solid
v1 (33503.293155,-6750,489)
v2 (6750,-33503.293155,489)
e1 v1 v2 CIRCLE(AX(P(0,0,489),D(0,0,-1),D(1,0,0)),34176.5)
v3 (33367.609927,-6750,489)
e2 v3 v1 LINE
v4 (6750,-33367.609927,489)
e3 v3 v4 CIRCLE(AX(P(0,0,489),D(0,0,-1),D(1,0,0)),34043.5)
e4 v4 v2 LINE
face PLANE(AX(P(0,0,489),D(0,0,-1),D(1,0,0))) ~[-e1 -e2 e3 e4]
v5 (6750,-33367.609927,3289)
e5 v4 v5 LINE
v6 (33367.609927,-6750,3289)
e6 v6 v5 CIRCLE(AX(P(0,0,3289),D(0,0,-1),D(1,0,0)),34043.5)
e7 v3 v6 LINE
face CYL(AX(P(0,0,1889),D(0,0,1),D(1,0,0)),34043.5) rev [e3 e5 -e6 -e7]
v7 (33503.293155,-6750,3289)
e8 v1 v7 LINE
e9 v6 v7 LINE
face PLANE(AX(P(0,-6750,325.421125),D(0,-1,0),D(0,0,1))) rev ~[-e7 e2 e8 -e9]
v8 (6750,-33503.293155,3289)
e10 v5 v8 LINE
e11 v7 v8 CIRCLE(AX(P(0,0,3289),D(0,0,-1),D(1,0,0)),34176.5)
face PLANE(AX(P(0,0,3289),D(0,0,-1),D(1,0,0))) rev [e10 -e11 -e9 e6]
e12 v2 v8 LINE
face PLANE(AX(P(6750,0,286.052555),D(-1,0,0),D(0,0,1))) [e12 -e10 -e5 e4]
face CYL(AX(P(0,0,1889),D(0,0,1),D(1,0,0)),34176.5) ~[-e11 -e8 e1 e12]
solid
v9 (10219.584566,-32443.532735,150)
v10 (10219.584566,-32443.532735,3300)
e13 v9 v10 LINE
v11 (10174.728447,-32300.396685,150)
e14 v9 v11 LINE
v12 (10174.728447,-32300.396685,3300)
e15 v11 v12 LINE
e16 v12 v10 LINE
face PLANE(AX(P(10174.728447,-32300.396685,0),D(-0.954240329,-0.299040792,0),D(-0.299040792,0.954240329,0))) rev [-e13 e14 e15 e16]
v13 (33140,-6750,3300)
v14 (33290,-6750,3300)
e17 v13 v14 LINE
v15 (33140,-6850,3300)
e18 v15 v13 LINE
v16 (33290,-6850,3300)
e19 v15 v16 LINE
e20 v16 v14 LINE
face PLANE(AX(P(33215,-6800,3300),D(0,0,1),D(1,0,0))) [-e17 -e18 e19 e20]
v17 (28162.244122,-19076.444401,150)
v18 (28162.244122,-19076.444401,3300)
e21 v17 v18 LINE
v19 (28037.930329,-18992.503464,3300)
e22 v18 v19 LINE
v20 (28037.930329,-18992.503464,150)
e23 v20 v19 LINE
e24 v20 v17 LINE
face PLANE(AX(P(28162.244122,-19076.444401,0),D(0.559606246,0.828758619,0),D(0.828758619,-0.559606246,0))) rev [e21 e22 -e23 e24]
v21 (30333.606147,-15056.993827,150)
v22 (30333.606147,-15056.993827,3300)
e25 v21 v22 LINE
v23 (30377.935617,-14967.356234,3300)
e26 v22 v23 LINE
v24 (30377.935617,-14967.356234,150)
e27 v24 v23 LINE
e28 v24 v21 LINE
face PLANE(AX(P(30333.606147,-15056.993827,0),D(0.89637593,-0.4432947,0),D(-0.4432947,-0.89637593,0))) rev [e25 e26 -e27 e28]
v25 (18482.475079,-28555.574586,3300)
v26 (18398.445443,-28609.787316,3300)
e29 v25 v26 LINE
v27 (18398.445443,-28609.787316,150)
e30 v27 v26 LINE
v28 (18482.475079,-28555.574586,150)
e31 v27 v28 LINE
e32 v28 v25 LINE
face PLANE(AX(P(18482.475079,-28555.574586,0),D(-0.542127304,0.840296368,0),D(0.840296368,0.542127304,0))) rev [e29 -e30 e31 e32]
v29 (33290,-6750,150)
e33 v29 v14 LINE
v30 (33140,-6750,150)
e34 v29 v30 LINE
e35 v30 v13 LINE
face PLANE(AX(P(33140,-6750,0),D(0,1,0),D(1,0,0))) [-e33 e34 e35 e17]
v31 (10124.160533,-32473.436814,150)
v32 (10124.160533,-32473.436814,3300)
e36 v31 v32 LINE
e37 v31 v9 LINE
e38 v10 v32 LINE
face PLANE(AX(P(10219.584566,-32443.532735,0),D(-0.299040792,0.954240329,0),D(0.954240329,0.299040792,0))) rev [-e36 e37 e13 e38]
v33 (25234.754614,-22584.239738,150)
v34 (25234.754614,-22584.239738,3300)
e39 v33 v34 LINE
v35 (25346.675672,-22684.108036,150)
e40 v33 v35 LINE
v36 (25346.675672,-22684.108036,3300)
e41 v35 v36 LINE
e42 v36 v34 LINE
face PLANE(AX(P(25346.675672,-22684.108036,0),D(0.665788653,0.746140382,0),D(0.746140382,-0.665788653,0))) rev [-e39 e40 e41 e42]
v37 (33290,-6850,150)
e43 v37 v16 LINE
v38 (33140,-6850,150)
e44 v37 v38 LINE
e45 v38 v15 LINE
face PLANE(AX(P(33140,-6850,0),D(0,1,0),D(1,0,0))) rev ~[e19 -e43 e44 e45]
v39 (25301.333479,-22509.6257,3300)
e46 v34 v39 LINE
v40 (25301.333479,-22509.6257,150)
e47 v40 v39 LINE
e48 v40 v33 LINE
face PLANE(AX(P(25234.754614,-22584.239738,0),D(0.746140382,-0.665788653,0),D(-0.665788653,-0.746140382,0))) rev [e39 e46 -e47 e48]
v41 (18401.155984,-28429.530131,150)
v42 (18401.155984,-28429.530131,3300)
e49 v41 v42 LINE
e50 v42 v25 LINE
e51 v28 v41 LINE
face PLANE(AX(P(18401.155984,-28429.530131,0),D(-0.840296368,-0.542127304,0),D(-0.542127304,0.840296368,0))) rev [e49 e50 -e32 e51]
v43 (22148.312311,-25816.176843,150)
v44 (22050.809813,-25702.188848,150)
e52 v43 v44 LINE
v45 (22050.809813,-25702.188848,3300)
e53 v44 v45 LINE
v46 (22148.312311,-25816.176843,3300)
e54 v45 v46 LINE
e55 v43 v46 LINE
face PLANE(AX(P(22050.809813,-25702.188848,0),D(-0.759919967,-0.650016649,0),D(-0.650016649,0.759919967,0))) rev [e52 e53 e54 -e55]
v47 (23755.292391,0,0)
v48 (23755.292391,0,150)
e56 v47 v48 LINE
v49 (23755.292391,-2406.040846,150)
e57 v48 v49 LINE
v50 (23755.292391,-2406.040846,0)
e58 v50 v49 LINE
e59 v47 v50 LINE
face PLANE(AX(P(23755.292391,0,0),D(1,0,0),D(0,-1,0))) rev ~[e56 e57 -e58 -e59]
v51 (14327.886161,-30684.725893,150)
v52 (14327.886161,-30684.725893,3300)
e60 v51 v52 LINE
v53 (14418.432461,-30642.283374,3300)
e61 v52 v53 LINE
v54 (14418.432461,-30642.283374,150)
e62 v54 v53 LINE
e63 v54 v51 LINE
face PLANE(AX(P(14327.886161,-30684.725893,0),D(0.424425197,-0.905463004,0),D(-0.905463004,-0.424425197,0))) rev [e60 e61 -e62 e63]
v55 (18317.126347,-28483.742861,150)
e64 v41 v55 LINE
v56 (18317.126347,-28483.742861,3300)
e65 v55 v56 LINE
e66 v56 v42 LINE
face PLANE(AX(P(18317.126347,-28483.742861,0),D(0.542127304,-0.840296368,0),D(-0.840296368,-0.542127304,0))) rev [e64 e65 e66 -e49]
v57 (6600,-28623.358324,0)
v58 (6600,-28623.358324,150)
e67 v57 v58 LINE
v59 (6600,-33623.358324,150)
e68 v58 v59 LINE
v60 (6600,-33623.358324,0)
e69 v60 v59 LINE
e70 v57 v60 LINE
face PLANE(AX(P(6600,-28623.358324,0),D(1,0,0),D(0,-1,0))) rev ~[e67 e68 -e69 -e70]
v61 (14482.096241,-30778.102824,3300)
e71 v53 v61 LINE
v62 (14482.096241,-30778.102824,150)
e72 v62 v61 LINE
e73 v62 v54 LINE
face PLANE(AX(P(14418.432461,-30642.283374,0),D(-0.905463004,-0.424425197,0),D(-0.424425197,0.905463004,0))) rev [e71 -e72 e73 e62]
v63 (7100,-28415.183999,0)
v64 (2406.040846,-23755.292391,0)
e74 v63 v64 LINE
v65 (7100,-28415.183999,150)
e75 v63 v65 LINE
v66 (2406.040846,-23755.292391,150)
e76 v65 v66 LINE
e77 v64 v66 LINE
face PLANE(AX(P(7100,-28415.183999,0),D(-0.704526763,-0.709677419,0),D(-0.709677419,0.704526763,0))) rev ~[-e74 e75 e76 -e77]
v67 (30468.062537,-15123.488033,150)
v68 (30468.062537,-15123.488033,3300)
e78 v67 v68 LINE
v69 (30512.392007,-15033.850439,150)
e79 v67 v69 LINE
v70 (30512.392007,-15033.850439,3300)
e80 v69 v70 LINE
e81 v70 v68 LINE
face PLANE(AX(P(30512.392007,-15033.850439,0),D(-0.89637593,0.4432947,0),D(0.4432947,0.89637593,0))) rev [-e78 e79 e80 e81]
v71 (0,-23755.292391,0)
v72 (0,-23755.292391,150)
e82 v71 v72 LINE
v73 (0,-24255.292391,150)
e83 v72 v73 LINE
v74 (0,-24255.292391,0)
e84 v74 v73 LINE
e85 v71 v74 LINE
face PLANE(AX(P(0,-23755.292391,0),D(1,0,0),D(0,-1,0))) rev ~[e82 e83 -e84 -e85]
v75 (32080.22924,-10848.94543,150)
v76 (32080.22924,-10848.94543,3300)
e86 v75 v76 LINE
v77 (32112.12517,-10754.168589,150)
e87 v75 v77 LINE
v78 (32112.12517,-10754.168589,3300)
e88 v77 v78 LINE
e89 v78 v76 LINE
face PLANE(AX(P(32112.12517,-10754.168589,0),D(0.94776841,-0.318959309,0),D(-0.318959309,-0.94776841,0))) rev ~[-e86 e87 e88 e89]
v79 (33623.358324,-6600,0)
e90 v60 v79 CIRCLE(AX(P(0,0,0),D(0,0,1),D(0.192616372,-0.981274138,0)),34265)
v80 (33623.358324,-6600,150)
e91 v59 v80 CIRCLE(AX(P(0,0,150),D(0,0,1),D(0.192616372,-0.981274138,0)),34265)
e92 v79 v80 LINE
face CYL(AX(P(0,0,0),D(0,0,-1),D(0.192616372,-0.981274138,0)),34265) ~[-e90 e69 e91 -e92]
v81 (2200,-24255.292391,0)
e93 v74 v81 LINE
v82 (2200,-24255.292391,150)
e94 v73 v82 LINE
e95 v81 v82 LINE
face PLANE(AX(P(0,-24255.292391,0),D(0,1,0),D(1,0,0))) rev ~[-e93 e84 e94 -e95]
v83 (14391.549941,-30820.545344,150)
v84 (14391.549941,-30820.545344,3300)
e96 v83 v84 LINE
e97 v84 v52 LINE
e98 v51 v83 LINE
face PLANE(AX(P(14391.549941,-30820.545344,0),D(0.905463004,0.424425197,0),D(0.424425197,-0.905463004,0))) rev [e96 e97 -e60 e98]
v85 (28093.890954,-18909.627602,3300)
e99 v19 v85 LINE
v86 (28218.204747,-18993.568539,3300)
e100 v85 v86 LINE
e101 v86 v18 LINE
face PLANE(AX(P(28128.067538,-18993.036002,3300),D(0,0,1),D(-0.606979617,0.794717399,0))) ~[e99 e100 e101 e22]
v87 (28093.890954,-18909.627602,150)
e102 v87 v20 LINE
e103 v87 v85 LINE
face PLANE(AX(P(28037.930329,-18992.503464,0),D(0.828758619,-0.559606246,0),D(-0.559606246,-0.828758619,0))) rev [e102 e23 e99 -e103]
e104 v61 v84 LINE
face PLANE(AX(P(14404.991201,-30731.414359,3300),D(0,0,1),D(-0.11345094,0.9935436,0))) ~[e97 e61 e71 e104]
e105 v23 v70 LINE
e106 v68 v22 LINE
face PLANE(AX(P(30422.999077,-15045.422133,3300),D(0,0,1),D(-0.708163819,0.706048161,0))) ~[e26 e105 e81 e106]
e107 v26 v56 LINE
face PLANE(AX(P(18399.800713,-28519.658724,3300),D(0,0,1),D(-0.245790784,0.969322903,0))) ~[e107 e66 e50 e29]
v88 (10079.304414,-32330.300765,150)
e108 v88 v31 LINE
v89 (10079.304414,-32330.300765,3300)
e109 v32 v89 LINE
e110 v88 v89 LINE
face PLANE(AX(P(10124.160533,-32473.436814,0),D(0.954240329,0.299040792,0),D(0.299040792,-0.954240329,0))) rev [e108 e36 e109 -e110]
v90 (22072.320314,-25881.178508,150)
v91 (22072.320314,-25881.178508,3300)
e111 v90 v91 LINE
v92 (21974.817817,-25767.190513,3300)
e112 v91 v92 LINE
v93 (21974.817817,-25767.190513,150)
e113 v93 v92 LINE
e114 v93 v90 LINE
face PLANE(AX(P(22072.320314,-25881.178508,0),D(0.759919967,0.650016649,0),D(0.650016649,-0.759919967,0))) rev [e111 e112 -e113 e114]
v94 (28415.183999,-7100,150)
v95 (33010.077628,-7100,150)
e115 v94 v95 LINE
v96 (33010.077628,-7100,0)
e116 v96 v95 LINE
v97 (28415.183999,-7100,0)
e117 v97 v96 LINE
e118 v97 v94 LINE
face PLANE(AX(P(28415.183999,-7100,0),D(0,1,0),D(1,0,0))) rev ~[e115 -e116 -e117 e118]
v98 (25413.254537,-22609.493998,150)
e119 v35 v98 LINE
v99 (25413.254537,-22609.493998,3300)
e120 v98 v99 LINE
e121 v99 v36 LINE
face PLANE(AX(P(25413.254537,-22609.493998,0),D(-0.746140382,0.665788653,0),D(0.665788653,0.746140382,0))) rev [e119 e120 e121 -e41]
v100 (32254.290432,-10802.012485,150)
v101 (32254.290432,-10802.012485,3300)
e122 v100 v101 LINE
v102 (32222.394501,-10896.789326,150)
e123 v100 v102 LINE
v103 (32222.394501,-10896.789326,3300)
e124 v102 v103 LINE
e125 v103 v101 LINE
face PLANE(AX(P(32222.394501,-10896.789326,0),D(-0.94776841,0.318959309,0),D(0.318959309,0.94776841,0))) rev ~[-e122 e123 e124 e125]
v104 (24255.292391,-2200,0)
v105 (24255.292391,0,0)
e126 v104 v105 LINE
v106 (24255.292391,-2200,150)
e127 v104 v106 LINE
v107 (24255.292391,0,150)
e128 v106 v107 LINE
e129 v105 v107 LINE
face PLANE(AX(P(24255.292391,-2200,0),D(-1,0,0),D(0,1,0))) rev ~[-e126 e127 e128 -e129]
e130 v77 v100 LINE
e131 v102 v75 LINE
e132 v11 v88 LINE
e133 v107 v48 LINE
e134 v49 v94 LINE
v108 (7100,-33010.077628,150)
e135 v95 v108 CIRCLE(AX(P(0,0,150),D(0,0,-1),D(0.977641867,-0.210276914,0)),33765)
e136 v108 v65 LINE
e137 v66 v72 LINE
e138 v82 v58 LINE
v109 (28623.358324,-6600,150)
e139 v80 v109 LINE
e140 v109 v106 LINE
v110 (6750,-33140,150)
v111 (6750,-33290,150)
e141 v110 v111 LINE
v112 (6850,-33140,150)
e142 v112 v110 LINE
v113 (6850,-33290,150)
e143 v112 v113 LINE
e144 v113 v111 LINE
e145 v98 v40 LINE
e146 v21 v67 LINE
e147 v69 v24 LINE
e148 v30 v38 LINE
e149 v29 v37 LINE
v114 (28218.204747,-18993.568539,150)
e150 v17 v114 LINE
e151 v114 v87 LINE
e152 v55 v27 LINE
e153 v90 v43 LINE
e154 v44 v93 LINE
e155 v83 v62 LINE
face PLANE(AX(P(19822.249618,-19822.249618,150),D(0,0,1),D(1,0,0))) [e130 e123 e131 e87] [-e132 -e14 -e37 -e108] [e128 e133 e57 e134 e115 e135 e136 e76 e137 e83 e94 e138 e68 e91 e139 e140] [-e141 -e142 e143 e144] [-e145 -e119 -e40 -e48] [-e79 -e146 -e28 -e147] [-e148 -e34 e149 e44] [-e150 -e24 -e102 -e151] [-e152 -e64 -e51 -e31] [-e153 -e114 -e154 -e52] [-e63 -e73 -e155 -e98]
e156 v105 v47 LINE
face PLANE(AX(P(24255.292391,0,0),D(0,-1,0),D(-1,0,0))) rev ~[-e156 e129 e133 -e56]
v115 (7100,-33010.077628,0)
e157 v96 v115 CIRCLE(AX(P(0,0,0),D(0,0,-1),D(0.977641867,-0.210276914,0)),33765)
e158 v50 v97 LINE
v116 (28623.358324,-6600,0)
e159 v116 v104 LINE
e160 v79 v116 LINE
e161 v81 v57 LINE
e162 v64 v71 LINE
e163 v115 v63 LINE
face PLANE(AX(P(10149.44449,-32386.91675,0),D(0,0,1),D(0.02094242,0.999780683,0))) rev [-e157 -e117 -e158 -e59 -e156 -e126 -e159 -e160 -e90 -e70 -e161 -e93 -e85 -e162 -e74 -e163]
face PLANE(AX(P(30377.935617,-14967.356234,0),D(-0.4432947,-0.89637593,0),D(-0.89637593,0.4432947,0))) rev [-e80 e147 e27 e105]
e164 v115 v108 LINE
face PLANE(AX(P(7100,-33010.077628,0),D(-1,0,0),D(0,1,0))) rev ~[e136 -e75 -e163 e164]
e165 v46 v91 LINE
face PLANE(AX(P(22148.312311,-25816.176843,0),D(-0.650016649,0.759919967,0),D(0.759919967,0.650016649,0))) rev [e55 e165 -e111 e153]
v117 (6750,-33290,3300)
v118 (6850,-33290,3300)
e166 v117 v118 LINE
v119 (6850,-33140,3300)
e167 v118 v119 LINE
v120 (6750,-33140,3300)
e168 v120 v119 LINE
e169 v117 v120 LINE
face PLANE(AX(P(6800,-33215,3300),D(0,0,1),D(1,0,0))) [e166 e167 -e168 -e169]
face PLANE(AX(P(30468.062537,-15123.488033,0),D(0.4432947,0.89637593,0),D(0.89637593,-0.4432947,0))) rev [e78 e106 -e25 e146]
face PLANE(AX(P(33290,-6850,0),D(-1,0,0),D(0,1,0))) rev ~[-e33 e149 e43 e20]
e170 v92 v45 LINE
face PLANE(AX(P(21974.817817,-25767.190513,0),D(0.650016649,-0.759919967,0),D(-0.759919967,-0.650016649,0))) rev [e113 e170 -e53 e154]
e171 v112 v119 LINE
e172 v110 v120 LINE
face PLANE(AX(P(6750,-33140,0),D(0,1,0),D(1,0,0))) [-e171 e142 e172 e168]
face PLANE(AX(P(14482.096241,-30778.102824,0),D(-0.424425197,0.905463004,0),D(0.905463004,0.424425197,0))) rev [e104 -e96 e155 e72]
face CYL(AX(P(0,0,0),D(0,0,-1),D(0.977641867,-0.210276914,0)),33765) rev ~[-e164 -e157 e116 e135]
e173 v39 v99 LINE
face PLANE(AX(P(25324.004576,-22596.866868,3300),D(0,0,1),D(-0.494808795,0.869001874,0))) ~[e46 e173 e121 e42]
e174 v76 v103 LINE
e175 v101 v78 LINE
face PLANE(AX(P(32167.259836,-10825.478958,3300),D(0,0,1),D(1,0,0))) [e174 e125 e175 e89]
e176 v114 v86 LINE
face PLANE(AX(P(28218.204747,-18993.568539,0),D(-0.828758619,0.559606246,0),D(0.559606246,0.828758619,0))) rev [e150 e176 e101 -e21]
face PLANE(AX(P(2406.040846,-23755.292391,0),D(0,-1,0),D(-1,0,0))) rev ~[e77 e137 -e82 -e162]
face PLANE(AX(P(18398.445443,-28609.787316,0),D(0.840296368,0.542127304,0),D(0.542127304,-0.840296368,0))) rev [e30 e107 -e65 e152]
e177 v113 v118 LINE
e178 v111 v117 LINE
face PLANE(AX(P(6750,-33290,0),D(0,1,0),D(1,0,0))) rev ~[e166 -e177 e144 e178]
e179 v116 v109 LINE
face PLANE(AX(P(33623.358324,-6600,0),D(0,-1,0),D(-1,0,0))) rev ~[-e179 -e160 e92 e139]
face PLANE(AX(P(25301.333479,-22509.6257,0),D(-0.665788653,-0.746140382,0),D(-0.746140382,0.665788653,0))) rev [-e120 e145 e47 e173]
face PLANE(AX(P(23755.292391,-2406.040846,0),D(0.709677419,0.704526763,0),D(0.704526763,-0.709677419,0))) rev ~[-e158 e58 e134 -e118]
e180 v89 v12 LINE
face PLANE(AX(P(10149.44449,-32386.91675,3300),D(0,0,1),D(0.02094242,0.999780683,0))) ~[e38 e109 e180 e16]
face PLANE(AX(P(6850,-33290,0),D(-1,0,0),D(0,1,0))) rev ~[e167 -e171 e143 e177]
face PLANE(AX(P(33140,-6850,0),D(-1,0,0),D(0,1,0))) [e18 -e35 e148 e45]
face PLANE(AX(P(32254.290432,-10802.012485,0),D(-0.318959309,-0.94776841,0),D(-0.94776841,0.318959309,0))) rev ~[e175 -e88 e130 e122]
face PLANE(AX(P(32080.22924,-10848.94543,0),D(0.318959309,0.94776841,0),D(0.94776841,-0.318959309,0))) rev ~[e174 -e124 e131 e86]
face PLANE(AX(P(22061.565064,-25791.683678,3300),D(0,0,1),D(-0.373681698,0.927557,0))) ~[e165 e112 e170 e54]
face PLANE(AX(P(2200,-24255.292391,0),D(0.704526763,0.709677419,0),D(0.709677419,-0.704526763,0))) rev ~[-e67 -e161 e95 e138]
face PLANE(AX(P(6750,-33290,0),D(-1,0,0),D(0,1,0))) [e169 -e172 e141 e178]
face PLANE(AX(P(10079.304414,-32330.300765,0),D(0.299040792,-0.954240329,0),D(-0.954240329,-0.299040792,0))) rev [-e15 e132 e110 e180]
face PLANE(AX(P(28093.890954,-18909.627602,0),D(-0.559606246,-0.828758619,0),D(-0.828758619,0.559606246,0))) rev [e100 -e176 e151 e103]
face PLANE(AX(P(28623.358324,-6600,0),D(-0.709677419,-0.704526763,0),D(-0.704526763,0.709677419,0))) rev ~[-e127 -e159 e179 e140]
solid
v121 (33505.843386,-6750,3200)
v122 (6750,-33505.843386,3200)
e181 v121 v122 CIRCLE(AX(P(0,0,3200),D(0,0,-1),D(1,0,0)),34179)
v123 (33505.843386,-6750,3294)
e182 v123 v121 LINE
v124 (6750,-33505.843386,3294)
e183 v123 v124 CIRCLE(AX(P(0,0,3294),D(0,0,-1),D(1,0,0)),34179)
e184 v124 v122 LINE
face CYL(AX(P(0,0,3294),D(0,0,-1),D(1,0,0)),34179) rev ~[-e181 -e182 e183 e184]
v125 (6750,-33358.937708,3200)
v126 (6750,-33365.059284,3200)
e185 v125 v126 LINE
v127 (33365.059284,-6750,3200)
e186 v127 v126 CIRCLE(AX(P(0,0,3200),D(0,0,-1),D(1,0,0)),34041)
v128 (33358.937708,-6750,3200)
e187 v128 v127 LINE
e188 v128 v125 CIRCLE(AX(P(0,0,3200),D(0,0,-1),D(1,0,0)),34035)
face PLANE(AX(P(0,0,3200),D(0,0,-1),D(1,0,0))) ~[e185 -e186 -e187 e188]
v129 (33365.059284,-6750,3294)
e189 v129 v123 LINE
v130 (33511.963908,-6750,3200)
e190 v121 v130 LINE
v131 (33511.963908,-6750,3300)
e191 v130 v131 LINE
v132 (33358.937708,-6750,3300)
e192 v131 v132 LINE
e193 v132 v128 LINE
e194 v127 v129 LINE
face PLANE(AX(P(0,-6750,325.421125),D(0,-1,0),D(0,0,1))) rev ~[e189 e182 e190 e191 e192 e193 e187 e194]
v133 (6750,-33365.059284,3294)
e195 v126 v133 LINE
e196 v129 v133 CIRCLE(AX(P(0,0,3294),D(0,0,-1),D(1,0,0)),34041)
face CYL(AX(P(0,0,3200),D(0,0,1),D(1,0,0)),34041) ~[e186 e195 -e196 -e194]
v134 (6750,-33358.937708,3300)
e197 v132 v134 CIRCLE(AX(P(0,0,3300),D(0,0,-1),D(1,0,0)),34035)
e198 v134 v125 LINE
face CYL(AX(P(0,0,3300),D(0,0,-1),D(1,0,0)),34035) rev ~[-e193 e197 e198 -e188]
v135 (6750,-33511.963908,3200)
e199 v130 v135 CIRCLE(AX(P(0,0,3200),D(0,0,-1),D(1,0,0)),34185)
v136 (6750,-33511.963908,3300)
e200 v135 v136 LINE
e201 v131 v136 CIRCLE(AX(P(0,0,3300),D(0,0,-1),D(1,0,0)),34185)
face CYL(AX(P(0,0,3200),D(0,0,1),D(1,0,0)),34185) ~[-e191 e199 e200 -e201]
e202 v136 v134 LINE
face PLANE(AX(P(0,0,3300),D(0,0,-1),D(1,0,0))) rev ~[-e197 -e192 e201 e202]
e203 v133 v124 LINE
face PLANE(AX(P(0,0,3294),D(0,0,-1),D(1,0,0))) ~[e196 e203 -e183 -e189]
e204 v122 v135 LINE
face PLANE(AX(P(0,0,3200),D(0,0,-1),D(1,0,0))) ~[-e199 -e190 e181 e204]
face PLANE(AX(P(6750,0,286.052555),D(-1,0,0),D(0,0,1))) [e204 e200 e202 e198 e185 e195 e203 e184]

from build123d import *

# Parameters (mm, degrees)
F2_DEPTH  = 150
F3_W      = 150
F3_H      = 100
F3_W_2    = 100
F3_H_2    = 150
F4_DEPTH  = 3300
F7_DEPTH  = 3300
F9_ANGLE  = 90
F10_W     = 133
F10_H     = 2800
F11_ANGLE = 90
F12_W     = 6750
F12_H     = 3694.4781839848
F13_DEPTH = 34185.001
F14_W     = 6750
F14_H     = 4040.5442416668
F15_DEPTH = 34185.001


# Not quite as in the source:
# - a pattern or mirror of a feature is missing from the dataset's text; its kind, count and spacing are read off the source's solid


with BuildPart() as f2:
    # F1 (on Top) → F2 (new body)
    with BuildSketch(Plane.XY):
        with BuildLine():
            Line((6600, -28623.3583242364), (6600, -33623.3583242364))
            ThreePointArc((6600, -33623.3583242364), (24229.0138573571, -24229.0138573571), (33623.3583242364, -6600))
            Line((33623.3583242364, -6600), (28623.3583242364, -6600))
            Line((28623.3583242364, -6600), (24255.2923906681, -2200))
            Line((24255.2923906681, -2200), (24255.2923906681, 0))
            Line((24255.2923906681, 0), (23755.2923906681, 0))
            Line((23755.2923906681, 0), (23755.2923906681, -2406.040845923))
            Line((23755.2923906681, -2406.040845923), (28415.1839985056, -7100))
            Line((28415.1839985056, -7100), (33010.0776279002, -7100))
            ThreePointArc((33010.0776279002, -7100), (23875.4604667638, -23875.4604667638), (7100, -33010.0776279002))
            Line((7100, -33010.0776279002), (7100, -28415.1839985056))
            Line((7100, -28415.1839985056), (2406.040845923, -23755.2923906681))
            Line((2406.040845923, -23755.2923906681), (0, -23755.2923906681))
            Line((0, -23755.2923906681), (0, -24255.2923906681))
            Line((0, -24255.2923906681), (2200, -24255.2923906681))
            Line((2200, -24255.2923906681), (6600, -28623.3583242364))
        make_face()
    extrude(amount=F2_DEPTH)

    # F3 (on Top) → F4 (join)
    with BuildSketch(Plane.XY):
        with Locations((33215, -6800)):
            Rectangle(F3_W, F3_H)
        with Locations((6800, -33215)):
            Rectangle(F3_W_2, F3_H_2)
    extrude(amount=F4_DEPTH)

    # F6 (on Top) → F7 (join)
    with BuildSketch(Plane.XY):
        Polygon((32112.1251704395, -10754.1685888787), (32096.1772049746, -10801.5570093792), (32080.2292395097, -10848.9454298796), (32222.3945010112, -10896.7893262743), (32238.3424664761, -10849.4009057739), (32254.290431941, -10802.0124852734), align=None)
    f7 = extrude(amount=F7_DEPTH)

    # F7_copies: F7 across plane
    add(f7.mirror(Plane(origin=(0, 0, 0), x_dir=(-0.9241655206, 0.3819922651, 0), z_dir=(-0.3819922651, -0.9241655206, 0))))

    # F7_copies1: F7 across plane
    add(f7.mirror(Plane(origin=(0, 0, 0), x_dir=(-0.8963759304, 0.4432947005, 0), z_dir=(-0.4432947005, -0.8963759304, 0))))

    # F7_copies2: F7 across plane
    add(f7.mirror(Plane(origin=(0, 0, 0), x_dir=(-0.8645255332, 0.5025889001, 0), z_dir=(-0.5025889001, -0.8645255332, 0))))

    # F7_copies3: F7 across plane
    add(f7.mirror(Plane(origin=(0, 0, 0), x_dir=(-0.8287586193, 0.5596062464, 0), z_dir=(-0.5596062464, -0.8287586193, 0))))

    # F7_copies4: F7 across plane
    add(f7.mirror(Plane(origin=(0, 0, 0), x_dir=(-0.7892372217, 0.6140884365, 0), z_dir=(-0.6140884365, -0.7892372217, 0))))

    # F7_copies5: F7 across plane
    add(f7.mirror(Plane(origin=(0, 0, 0), x_dir=(-0.7461403823, 0.6657886526, 0), z_dir=(-0.6657886526, -0.7461403823, 0))))

    # F7_copies6: F7 across plane
    add(f7.mirror(Plane(origin=(0, 0, 0), x_dir=(0.6996633405, -0.7144726796, 0), z_dir=(-0.7144726796, -0.6996633405, 0))))


with BuildPart() as f9:
    # F8 (on Front) → F9 (revolve)
    with BuildSketch(Plane.XZ):
        Polygon((34185, 3300), (34035, 3300), (34035, 3200), (34041, 3200), (34041, 3294), (34179, 3294), (34179, 3200), (34185, 3200), align=None)
    revolve(axis=Axis((0, 0, 3739.7677898407), (0, 0, -1)), revolution_arc=F9_ANGLE)


with BuildPart() as f11:
    # F10 (on Front) → F11 (revolve)
    with BuildSketch(Plane.XZ):
        with Locations((34110, 1889)):
            Rectangle(F10_W, F10_H)
    revolve(axis=Axis((0, 0, 3739.7677898407), (0, 0, -1)), revolution_arc=F11_ANGLE)


with BuildPart() as f13_tool:
    # F12 (on Front) → F13 (new body, through all)
    with BuildSketch(Plane.XZ):
        with Locations((3375, 2133.2916468382)):
            Rectangle(F12_W, F12_H)
    extrude(amount=F13_DEPTH)


with BuildPart() as f9_1:
    add(f9.part)

    # F13: cut by f13_tool
    add(f13_tool.part, mode=Mode.SUBTRACT)


with BuildPart() as f11_1:
    add(f11.part)

    # F13: cut by f13_tool
    add(f13_tool.part, mode=Mode.SUBTRACT)


with BuildPart() as f15_tool:
    # F14 (on Right) → F15 (new body, through all)
    with BuildSketch(Plane.YZ):
        with Locations((-3375, 2345.6932455301)):
            Rectangle(F14_W, F14_H)
    extrude(amount=F15_DEPTH)


with BuildPart() as f9_2:
    add(f9_1.part)

    # F15: cut by f15_tool
    add(f15_tool.part, mode=Mode.SUBTRACT)


with BuildPart() as f11_2:
    add(f11_1.part)

    # F15: cut by f15_tool
    add(f15_tool.part, mode=Mode.SUBTRACT)


solid = Compound([f2.part, f9_2.part, f11_2.part])
